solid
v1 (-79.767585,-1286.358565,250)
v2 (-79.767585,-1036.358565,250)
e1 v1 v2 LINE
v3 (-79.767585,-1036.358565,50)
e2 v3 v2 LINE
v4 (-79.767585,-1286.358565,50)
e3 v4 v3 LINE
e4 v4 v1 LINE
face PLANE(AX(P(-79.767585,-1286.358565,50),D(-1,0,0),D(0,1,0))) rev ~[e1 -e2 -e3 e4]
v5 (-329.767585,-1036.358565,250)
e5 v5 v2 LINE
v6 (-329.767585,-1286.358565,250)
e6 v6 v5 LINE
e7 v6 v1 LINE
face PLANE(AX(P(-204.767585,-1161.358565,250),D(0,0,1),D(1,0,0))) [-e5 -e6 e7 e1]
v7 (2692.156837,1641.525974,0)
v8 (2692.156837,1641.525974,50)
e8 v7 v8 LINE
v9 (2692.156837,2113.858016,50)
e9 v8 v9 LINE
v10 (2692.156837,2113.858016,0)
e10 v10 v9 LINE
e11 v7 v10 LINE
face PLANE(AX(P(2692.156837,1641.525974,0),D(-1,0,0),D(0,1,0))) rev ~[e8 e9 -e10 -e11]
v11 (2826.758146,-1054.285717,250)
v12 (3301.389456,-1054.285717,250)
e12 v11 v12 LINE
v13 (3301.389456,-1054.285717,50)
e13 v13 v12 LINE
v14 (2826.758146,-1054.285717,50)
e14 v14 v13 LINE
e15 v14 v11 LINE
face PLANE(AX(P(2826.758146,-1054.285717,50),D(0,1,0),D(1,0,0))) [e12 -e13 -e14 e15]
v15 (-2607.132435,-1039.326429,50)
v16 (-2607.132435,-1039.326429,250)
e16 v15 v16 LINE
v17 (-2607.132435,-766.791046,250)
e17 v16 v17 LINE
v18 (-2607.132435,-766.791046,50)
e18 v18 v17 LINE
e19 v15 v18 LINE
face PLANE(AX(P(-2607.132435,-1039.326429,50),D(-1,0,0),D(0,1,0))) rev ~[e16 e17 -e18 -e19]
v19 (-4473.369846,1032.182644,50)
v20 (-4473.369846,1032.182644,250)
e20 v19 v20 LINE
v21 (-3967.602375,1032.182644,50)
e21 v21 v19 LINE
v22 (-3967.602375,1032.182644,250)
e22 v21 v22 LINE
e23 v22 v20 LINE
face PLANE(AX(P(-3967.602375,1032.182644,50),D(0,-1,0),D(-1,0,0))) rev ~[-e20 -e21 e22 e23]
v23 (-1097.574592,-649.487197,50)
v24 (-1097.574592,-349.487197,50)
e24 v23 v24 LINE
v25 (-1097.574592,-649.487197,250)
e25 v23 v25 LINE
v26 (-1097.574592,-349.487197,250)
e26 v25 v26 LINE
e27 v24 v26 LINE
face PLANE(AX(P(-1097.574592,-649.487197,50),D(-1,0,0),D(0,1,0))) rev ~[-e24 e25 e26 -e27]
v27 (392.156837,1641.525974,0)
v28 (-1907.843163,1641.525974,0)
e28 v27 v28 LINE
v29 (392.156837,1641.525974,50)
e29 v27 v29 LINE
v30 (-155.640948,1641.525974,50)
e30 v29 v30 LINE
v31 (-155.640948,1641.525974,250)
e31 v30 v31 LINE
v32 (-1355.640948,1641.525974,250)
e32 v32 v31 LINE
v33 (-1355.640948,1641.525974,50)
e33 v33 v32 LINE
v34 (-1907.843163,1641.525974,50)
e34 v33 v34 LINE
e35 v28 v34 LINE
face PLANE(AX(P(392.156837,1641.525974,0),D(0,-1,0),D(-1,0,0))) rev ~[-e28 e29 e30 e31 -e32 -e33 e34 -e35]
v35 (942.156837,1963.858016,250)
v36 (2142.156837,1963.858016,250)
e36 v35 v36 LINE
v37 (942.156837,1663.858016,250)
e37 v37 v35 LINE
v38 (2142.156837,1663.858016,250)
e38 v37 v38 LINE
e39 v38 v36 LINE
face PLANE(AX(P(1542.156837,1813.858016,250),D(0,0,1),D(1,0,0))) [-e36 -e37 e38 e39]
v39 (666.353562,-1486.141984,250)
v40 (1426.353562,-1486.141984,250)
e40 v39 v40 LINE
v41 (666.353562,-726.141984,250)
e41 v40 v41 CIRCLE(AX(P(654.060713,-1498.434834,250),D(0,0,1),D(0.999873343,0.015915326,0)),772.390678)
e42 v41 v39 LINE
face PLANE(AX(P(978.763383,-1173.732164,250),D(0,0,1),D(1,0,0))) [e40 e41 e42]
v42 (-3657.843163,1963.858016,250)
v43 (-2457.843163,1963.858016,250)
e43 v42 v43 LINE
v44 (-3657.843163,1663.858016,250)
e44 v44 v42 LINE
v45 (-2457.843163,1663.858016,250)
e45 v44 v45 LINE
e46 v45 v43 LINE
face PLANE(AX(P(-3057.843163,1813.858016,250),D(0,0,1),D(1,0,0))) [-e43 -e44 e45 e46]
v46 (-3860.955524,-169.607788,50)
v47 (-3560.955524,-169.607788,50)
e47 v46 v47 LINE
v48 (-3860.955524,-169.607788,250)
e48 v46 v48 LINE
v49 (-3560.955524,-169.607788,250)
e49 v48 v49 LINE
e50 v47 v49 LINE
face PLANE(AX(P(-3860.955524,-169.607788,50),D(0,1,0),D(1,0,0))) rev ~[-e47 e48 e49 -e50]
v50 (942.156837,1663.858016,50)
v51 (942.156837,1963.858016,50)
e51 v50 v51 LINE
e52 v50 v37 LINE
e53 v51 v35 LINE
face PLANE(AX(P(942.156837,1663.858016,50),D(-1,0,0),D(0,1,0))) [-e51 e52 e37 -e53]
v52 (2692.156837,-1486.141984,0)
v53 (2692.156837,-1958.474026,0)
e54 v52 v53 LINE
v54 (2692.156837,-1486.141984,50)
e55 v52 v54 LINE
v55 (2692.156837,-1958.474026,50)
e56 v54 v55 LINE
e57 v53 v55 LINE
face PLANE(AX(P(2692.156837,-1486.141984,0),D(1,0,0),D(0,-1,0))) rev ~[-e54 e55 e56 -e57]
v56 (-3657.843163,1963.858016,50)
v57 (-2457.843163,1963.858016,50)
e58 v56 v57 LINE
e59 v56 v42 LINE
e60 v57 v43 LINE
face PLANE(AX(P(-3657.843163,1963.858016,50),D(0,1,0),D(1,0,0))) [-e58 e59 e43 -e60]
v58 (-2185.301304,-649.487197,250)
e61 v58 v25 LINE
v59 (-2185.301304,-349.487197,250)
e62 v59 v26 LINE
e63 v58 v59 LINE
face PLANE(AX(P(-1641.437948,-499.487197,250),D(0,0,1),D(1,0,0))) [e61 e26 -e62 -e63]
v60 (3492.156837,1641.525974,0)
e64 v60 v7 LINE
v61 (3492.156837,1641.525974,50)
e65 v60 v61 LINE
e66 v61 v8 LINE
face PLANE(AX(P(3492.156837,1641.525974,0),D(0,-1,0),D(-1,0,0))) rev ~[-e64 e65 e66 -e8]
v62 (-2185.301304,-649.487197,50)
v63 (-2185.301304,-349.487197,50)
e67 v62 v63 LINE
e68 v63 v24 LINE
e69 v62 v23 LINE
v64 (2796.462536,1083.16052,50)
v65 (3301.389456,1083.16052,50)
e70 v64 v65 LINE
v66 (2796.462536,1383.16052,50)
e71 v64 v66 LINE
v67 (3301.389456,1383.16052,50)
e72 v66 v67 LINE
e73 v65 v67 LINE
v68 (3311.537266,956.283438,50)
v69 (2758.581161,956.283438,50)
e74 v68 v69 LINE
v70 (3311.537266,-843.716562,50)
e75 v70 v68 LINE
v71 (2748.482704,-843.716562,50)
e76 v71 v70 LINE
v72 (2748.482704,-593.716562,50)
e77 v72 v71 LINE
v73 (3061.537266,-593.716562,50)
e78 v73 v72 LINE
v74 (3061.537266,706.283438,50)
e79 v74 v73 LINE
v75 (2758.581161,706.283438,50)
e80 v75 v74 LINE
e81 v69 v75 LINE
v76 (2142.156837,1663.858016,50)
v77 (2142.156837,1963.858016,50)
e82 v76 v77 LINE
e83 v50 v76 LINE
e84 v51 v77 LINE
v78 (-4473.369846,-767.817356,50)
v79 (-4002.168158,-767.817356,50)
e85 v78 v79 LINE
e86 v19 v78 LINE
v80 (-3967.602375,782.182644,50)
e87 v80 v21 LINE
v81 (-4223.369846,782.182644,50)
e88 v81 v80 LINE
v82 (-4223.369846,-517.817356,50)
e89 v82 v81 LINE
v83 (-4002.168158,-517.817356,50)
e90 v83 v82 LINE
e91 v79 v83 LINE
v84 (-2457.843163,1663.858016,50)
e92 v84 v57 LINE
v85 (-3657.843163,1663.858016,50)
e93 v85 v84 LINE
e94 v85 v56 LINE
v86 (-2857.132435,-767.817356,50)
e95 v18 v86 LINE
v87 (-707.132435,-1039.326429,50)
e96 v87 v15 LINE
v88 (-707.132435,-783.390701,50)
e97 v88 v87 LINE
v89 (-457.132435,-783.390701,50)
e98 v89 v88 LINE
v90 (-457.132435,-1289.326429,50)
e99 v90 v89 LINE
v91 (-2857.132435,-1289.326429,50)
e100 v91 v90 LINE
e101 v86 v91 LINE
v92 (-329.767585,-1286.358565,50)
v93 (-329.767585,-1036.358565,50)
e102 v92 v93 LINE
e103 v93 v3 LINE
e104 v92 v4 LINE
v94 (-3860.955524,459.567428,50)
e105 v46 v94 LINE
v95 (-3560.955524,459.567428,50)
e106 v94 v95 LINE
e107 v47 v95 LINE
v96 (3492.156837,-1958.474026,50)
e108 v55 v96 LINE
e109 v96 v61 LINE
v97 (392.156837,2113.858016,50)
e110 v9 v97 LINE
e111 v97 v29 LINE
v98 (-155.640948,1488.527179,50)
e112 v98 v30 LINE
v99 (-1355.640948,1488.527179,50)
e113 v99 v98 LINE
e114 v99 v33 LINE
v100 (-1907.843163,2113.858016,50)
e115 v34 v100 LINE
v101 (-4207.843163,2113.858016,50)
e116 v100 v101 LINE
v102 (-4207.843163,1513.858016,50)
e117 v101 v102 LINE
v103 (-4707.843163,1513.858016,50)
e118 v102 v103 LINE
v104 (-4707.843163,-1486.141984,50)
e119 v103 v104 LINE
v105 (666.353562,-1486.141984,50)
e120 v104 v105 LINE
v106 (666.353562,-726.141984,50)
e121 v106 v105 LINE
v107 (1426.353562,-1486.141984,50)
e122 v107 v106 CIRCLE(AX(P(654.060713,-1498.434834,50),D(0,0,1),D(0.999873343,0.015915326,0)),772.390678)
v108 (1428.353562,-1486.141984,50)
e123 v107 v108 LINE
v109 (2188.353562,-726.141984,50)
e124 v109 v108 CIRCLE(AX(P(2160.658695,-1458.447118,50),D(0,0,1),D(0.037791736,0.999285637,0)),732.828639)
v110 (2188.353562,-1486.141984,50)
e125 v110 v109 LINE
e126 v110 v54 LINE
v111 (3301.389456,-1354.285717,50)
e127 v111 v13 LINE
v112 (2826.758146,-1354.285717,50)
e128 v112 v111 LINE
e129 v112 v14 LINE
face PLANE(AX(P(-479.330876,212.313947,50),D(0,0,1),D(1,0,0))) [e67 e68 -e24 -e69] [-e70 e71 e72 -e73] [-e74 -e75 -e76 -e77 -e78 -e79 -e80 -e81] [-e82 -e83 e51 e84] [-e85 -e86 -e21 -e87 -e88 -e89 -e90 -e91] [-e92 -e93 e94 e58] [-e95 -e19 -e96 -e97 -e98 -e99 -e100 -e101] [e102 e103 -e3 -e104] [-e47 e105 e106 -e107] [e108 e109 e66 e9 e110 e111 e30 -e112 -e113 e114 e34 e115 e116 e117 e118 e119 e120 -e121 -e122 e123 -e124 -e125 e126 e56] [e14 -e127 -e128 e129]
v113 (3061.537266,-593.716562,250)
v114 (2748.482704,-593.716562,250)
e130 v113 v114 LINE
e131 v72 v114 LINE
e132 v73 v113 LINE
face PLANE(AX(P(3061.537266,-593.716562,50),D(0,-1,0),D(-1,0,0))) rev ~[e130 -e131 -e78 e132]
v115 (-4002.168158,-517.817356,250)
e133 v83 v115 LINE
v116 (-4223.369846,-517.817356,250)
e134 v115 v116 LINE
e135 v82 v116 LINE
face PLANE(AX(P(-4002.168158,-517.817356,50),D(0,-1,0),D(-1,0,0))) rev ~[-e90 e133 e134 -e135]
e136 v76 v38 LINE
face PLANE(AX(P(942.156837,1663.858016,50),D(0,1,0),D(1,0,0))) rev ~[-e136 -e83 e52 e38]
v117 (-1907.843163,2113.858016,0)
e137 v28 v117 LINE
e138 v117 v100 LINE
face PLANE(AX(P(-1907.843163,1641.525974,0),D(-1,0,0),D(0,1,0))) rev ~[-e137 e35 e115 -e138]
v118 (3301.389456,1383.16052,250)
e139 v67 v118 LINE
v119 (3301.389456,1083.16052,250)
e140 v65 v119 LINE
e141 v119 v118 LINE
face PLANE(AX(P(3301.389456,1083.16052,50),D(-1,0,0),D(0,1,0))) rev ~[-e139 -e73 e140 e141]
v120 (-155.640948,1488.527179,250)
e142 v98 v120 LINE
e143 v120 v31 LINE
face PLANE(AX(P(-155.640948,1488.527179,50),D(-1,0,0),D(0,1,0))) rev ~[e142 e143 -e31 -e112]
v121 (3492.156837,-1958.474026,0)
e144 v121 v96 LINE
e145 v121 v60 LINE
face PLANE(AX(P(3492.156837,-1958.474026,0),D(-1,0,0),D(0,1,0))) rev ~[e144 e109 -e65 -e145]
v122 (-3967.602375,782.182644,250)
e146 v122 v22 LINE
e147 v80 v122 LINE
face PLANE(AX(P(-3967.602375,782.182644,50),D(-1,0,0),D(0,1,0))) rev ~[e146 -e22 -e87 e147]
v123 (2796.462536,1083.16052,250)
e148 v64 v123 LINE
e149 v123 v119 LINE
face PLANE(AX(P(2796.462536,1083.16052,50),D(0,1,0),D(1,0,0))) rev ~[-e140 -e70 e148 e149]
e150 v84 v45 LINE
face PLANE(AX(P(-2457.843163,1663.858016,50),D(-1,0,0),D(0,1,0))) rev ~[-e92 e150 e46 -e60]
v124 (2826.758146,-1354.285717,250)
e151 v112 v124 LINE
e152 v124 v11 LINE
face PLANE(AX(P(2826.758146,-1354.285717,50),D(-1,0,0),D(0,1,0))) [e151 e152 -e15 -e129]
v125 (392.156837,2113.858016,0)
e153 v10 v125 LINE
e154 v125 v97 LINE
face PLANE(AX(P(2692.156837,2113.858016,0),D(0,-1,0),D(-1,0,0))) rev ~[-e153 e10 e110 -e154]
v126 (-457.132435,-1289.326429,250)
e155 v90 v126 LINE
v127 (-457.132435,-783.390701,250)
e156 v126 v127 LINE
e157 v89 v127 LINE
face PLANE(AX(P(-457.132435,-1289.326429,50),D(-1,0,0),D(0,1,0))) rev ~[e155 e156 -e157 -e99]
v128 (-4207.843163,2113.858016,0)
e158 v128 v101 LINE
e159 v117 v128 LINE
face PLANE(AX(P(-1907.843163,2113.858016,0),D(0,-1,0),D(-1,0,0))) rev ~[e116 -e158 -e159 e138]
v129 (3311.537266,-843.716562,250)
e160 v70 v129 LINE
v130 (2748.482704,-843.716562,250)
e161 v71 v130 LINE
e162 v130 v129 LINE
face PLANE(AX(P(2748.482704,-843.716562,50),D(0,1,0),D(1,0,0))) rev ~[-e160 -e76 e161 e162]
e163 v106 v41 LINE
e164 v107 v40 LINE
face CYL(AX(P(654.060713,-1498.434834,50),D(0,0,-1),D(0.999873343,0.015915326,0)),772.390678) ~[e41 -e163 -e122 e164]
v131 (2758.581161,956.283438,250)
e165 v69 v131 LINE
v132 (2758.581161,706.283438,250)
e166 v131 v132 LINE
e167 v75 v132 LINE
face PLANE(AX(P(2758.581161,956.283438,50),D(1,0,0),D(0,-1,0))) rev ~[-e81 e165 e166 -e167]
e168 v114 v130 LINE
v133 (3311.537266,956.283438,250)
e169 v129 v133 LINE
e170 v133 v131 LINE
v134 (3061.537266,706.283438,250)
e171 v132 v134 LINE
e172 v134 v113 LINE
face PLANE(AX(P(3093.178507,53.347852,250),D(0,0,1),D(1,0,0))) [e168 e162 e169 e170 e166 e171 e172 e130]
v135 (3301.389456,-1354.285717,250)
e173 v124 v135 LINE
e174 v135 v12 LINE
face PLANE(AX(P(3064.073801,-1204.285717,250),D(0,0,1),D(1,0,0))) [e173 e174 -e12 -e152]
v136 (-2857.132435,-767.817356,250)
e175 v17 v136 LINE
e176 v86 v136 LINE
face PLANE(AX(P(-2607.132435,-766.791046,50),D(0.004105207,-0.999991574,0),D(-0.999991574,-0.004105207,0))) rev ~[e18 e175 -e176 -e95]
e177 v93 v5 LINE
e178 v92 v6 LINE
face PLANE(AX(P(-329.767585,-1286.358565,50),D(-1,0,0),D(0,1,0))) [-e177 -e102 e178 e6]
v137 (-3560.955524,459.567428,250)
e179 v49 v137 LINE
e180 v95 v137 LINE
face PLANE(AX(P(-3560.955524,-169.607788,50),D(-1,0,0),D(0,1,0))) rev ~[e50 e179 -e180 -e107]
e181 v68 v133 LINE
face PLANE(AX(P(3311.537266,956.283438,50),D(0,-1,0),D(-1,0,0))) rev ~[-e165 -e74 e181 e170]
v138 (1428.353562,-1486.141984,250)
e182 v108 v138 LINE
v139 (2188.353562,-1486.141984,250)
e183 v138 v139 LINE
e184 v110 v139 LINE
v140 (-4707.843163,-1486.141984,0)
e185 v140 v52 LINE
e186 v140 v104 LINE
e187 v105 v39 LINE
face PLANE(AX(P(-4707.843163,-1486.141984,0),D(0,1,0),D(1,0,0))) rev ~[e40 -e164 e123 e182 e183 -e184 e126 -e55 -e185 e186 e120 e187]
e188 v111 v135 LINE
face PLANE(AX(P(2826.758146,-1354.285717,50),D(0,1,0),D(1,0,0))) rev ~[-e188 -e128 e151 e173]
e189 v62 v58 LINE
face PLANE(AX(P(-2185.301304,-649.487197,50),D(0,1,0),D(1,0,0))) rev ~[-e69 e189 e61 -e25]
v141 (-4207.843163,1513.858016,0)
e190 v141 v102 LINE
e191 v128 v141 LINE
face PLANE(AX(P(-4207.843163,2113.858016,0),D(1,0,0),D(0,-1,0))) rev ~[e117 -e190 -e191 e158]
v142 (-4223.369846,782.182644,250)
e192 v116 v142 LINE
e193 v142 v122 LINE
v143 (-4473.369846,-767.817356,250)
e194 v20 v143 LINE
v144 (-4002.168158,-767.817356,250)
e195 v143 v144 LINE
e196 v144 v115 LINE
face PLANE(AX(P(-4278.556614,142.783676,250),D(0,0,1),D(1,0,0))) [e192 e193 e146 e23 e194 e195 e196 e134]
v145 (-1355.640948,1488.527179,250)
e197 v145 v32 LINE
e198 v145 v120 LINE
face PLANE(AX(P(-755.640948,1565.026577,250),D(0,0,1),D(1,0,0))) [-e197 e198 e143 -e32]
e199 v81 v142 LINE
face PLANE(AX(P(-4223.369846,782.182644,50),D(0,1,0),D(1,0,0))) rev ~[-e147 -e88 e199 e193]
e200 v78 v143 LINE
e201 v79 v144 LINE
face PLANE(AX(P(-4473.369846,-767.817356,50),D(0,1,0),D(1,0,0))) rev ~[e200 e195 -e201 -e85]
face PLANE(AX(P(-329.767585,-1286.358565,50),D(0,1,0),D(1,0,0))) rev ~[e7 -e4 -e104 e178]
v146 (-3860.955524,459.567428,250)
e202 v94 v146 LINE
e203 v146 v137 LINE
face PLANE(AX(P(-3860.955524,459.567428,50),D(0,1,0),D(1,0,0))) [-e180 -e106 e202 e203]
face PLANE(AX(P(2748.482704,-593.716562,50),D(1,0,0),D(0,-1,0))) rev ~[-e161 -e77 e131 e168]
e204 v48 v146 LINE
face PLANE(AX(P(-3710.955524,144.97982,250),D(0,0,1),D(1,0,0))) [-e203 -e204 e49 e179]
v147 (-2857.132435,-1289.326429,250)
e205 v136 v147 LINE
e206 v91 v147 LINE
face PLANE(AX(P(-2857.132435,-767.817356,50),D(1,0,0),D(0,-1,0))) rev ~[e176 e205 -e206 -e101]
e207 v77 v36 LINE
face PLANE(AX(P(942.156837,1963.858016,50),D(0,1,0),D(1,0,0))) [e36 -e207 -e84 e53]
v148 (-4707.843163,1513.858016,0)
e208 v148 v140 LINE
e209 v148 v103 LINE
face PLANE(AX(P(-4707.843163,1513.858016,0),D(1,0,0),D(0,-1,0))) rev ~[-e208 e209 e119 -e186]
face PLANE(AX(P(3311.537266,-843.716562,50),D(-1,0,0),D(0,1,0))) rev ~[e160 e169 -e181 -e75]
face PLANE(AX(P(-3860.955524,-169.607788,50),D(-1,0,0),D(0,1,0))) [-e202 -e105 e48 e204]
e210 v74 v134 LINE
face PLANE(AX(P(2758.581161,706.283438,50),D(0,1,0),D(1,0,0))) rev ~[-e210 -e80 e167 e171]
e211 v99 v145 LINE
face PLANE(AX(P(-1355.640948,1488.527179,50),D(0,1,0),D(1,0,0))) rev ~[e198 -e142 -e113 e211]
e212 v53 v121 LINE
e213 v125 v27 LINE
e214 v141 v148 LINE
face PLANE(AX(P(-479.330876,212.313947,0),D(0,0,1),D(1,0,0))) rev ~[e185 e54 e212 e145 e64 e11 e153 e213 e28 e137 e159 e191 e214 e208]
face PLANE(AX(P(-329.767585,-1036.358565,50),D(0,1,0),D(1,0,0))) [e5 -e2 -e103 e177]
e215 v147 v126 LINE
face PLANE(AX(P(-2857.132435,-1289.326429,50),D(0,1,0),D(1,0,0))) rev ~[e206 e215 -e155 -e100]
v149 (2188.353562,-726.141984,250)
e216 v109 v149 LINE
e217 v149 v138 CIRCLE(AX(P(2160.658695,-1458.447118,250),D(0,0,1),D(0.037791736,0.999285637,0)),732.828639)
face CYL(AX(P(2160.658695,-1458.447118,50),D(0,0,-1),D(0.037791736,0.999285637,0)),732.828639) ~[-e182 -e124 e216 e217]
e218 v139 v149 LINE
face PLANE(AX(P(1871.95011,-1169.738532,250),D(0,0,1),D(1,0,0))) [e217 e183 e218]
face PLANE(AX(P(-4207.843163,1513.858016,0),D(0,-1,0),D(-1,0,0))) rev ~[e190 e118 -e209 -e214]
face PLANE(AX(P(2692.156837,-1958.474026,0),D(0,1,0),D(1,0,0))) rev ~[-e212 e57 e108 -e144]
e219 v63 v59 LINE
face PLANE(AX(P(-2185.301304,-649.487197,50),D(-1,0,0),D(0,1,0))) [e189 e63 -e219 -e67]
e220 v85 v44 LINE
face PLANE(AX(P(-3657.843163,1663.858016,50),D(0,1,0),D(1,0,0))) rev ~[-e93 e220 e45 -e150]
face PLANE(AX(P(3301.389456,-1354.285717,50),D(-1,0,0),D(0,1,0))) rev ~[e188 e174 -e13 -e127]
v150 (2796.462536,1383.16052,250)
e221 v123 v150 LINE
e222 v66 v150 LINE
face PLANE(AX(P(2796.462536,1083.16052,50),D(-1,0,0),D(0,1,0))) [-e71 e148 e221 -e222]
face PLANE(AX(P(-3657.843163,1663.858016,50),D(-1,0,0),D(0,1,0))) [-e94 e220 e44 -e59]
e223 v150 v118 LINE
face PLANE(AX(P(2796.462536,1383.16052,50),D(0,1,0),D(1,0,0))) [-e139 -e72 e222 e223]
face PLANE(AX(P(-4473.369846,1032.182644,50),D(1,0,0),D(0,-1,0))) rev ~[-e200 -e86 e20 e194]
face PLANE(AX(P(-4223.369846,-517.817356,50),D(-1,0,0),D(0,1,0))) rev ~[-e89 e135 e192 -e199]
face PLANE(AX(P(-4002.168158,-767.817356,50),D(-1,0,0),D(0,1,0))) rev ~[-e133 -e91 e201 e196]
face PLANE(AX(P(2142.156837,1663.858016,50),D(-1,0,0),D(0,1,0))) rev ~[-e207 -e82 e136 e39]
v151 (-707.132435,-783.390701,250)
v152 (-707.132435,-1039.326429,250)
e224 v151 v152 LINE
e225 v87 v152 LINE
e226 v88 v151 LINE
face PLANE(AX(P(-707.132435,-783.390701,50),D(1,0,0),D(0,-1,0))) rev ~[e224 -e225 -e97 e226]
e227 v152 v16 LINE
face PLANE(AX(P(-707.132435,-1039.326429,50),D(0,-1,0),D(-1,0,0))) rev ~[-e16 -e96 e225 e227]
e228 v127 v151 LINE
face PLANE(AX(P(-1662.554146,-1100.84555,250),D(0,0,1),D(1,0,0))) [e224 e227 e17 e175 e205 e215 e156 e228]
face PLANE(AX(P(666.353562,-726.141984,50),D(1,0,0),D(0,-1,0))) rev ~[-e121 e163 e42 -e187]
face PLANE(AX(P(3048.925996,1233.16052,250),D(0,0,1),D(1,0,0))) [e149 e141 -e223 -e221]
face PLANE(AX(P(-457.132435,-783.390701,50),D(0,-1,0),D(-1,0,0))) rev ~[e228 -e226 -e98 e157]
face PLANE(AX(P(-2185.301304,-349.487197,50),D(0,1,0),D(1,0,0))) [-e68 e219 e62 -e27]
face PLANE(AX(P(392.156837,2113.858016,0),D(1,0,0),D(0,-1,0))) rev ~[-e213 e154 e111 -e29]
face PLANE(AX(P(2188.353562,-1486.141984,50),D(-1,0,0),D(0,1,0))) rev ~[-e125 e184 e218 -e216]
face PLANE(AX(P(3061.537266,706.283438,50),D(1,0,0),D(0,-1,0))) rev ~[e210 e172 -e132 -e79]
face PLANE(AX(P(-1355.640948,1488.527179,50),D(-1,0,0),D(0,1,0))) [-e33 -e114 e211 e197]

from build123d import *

# Parameters (mm, degrees)
F1_DEPTH = 50
F2_W     = 1200
F2_H     = 300
F2_W_2   = 300
F2_H_2   = 629.1752159595
F2_W_3   = 1087.7267122269
F2_W_4   = 250
F2_H_3   = 250
F2_H_4   = 152.9987954981
F2_W_5   = 504.9269199371
F2_W_6   = 474.6313095093
F3_DEPTH = 200
F4_DEPTH = 200


# Not quite as in the source:
# - a feature names something its author has since deleted; it is built from what else it names


with BuildPart() as f1:
    # F0 (on Top) → F1 (new body)
    with BuildSketch(Plane.XY):
        Polygon((-4707.8431632393, 1513.8580155657), (-4707.8431632393, -1486.1419844343), (2692.1568367607, -1486.1419844343), (2692.1568367607, -1958.4740257375), (3492.1568367607, -1958.4740257375), (3492.1568367607, 1641.5259742625), (2692.1568367607, 1641.5259742625), (2692.1568367607, 2113.8580155657), (392.1568367607, 2113.8580155657), (392.1568367607, 1641.5259742625), (-1907.8431632393, 1641.5259742625), (-1907.8431632393, 2113.8580155657), (-4207.8431632393, 2113.8580155657), (-4207.8431632393, 1513.8580155657), align=None)
    extrude(amount=F1_DEPTH)

    # F2 (on face) → F3 (join)
    with BuildSketch(Plane.XY.offset(50)):
        with Locations((-3057.8431632393, 1813.8580155657)):
            Rectangle(F2_W, F2_H)
        Polygon((-3967.6023748444, 782.182643881), (-3967.6023748444, 1032.182643881), (-4473.3698458788, 1032.182643881), (-4473.3698458788, -767.817356119), (-4002.1681580892, -767.817356119), (-4002.1681580892, -517.817356119), (-4223.3698458788, -517.817356119), (-4223.3698458788, 782.182643881), align=None)
        with Locations((-3710.9555244446, 144.9798196554)):
            Rectangle(F2_W_2, F2_H_2)
        Polygon((-2607.132434845, -766.7910456657), (-2857.132434845, -767.817356119), (-2857.132434845, -1289.3264293671), (-457.132434845, -1289.3264293671), (-457.132434845, -783.3907008171), (-707.132434845, -783.3907008171), (-707.132434845, -1039.3264293671), (-2607.132434845, -1039.3264293671), align=None)
        with Locations((-1641.4379477501, -499.4871973991)):
            Rectangle(F2_W_3, F2_H)
        with Locations((-204.7675848007, -1161.3585650921)):
            Rectangle(F2_W_4, F2_H_3)
        with Locations((-755.6409478188, 1565.0265765134)):
            Rectangle(F2_W, F2_H_4)
        with Locations((3048.9259958267, 1233.1605195999)):
            Rectangle(F2_W_5, F2_H)
        Polygon((3311.5372657776, 956.2834382057), (2758.581161499, 956.2834382057), (2758.581161499, 706.2834382057), (3061.5372657776, 706.2834382057), (3061.5372657776, -593.7165617943), (2748.4827041626, -593.7165617943), (2748.4827041626, -843.7165617943), (3311.5372657776, -843.7165617943), align=None)
        with Locations((3064.0738010406, -1204.2857170105)):
            Rectangle(F2_W_6, F2_H)
    extrude(amount=F3_DEPTH)

    # F2 (on face) → F4 (join)
    with BuildSketch(Plane.XY.offset(50)):
        with Locations((-3057.8431632393, 1813.8580155657)):
            Rectangle(F2_W, F2_H)
        Polygon((-3967.6023748444, 782.182643881), (-3967.6023748444, 1032.182643881), (-4473.3698458788, 1032.182643881), (-4473.3698458788, -767.817356119), (-4002.1681580892, -767.817356119), (-4002.1681580892, -517.817356119), (-4223.3698458788, -517.817356119), (-4223.3698458788, 782.182643881), align=None)
        with Locations((-3710.9555244446, 144.9798196554)):
            Rectangle(F2_W_2, F2_H_2)
        Polygon((-2607.132434845, -766.7910456657), (-2857.132434845, -767.817356119), (-2857.132434845, -1289.3264293671), (-457.132434845, -1289.3264293671), (-457.132434845, -783.3907008171), (-707.132434845, -783.3907008171), (-707.132434845, -1039.3264293671), (-2607.132434845, -1039.3264293671), align=None)
        with Locations((-1641.4379477501, -499.4871973991)):
            Rectangle(F2_W_3, F2_H)
        with Locations((-204.7675848007, -1161.3585650921)):
            Rectangle(F2_W_4, F2_H_3)
        with Locations((-755.6409478188, 1565.0265765134)):
            Rectangle(F2_W, F2_H_4)
        with Locations((1542.1568367607, 1813.8580155657)):
            Rectangle(F2_W, F2_H)
        with Locations((3048.9259958267, 1233.1605195999)):
            Rectangle(F2_W_5, F2_H)
        Polygon((3311.5372657776, 956.2834382057), (2758.581161499, 956.2834382057), (2758.581161499, 706.2834382057), (3061.5372657776, 706.2834382057), (3061.5372657776, -593.7165617943), (2748.4827041626, -593.7165617943), (2748.4827041626, -843.7165617943), (3311.5372657776, -843.7165617943), align=None)
        with Locations((3064.0738010406, -1204.2857170105)):
            Rectangle(F2_W_6, F2_H)
        with BuildLine():
            Line((666.3535618782, -726.1419844343), (666.3535618782, -1486.1419844343))
            Line((666.3535618782, -1486.1419844343), (1426.3535618782, -1486.1419844343))
            ThreePointArc((1426.3535618782, -1486.1419844343), (1200.2233986174, -952.2721476951), (666.3535618782, -726.1419844343))
        make_face()
        with BuildLine():
            Line((1428.3535618782, -1486.1419844343), (2188.3535618782, -1486.1419844343))
            Line((2188.3535618782, -1486.1419844343), (2188.3535618782, -726.1419844343))
            ThreePointArc((2188.3535618782, -726.1419844343), (1642.4705952714, -940.2590178275), (1428.3535618782, -1486.1419844343))
        make_face()
    extrude(amount=F4_DEPTH)


solid = f1.part
